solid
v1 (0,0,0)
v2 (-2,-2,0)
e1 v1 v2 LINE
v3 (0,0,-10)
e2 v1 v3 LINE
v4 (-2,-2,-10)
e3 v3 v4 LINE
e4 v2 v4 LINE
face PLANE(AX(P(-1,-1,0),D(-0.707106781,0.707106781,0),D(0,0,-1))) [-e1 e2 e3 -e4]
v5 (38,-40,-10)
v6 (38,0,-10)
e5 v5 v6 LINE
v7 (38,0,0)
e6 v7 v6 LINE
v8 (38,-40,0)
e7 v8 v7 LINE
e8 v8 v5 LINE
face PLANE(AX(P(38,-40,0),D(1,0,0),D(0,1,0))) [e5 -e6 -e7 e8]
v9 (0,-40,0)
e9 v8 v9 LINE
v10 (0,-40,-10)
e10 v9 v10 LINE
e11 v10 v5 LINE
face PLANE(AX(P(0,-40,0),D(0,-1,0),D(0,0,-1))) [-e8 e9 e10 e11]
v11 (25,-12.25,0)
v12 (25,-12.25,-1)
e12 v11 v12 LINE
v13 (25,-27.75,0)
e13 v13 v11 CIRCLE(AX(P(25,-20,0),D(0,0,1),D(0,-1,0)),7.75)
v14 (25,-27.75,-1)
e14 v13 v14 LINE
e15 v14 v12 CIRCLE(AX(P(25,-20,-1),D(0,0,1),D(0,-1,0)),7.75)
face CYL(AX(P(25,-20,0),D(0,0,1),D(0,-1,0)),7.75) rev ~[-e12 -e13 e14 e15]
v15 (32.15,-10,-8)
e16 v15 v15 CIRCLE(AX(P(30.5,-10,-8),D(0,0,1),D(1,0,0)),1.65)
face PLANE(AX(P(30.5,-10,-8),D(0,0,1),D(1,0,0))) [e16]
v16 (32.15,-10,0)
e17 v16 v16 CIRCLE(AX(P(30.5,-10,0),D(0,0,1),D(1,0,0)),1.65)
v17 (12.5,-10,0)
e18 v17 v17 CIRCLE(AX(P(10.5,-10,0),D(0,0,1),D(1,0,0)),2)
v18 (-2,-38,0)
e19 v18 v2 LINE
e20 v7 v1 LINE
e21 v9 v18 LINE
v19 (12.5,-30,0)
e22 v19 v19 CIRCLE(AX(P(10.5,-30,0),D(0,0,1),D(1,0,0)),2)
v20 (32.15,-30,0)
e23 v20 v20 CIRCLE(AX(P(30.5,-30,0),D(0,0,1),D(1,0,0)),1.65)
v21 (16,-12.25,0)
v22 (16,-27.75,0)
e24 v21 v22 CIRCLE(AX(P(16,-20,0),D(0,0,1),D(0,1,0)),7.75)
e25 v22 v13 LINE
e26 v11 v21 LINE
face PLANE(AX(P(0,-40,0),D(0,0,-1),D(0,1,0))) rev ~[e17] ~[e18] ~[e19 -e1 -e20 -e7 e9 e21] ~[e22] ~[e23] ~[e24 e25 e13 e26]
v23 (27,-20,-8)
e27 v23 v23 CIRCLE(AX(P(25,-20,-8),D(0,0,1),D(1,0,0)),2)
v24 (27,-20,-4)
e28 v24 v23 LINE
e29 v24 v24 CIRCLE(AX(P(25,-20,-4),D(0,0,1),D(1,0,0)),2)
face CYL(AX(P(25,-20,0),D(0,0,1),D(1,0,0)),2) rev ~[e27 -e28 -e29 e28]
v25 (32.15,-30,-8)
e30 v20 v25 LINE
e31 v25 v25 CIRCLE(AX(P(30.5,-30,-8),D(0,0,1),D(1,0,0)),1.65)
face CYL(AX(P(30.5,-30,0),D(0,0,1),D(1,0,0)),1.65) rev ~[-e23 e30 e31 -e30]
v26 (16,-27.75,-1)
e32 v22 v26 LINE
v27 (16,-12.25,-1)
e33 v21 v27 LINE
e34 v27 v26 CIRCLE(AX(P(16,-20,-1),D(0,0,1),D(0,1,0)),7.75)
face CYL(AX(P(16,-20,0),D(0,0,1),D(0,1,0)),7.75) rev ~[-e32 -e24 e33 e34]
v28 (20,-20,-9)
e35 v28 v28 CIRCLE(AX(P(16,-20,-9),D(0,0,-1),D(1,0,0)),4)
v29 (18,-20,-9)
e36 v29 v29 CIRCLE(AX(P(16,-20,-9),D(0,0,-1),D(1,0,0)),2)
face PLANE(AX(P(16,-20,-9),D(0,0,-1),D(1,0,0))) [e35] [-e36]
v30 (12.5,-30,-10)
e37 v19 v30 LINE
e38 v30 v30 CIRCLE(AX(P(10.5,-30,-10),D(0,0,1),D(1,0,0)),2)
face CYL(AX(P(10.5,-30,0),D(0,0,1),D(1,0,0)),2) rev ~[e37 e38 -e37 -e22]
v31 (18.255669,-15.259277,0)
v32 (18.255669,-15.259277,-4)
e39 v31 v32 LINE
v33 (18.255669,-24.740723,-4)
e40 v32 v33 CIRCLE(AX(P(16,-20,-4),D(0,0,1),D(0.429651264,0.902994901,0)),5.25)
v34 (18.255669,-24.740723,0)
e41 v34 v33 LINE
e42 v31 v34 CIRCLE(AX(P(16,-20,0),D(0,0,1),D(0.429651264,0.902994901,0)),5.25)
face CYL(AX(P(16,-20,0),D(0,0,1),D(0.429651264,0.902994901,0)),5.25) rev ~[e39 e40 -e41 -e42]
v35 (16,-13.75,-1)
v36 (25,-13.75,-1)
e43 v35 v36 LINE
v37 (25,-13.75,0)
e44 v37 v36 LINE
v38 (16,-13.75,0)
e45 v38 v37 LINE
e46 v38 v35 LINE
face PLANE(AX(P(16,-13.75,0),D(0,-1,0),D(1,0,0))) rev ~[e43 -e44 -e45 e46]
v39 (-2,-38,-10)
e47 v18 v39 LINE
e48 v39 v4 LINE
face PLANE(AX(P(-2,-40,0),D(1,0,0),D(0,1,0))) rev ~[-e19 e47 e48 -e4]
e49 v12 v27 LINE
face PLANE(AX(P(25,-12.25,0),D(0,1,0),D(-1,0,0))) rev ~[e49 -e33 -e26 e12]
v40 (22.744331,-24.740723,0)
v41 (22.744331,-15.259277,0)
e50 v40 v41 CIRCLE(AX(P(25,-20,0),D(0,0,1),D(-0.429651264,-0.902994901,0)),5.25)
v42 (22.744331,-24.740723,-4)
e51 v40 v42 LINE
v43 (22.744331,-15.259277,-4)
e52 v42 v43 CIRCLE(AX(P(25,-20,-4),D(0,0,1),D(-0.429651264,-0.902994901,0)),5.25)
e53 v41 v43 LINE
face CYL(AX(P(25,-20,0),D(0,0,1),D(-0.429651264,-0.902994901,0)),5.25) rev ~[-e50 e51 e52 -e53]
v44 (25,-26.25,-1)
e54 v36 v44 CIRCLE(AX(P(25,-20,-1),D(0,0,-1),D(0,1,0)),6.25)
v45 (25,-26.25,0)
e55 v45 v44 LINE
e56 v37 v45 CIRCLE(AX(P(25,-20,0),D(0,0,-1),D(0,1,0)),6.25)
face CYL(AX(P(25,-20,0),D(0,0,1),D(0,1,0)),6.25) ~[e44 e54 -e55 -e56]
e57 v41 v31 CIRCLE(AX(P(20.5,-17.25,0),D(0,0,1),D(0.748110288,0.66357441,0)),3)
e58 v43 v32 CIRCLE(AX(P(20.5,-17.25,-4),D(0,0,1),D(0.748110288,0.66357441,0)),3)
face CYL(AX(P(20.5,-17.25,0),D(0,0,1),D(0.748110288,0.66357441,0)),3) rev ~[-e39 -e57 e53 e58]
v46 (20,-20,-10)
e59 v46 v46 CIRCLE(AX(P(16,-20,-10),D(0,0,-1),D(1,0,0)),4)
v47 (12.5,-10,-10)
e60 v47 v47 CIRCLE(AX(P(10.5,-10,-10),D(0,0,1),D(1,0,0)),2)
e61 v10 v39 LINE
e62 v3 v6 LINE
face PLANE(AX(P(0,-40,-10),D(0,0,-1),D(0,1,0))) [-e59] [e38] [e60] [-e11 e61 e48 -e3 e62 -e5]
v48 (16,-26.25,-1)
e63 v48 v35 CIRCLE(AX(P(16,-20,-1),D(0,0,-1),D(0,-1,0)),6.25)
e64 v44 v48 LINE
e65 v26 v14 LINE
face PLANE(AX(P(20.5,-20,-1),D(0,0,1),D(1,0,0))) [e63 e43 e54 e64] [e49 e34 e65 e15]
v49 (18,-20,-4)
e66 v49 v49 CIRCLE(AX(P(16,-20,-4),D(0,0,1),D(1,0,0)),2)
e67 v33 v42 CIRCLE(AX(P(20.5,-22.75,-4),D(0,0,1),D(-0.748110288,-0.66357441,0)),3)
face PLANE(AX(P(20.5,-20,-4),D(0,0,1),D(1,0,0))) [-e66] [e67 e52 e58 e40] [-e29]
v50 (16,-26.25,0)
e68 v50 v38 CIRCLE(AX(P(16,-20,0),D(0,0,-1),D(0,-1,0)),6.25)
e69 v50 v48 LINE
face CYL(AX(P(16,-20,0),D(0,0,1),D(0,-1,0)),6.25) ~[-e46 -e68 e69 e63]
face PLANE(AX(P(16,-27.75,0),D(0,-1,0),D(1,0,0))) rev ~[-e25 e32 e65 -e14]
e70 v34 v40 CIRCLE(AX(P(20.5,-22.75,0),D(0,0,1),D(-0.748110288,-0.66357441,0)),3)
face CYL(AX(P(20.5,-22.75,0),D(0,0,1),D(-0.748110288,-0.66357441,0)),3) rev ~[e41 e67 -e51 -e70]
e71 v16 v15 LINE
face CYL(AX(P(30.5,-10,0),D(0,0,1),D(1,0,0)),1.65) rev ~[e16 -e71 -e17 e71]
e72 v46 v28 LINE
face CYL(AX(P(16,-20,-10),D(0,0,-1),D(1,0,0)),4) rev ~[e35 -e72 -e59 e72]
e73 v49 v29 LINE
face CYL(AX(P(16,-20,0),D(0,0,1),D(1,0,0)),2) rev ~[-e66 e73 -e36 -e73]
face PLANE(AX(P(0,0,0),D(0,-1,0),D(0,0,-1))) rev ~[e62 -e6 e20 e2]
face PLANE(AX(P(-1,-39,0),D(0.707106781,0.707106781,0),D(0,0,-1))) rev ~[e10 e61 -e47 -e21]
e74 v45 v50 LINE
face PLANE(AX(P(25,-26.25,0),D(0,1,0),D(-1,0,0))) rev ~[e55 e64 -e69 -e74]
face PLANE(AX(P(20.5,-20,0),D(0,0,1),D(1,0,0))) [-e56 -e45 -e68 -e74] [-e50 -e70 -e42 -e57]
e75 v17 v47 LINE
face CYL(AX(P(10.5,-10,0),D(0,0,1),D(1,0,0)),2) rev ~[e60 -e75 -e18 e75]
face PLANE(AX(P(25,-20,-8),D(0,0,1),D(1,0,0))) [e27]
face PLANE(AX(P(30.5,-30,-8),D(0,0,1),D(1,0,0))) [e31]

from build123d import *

# Parameters (mm, degrees)
F0_W      = 41
F0_H      = 40
F0_R      = 2
F0_R_2    = 1.65
F1_DEPTH  = 10
F2_DEPTH  = 1
F3_DEPTH  = 8
F4_DEPTH  = 4
F5_R      = 4
F5_R_2    = 2
F6_DEPTH  = 1
F7_DEPTH  = 8
F8_DEPTH  = 2
F9_SIZE   = 2
F10_DEPTH = 3


# Not quite as in the source:
# - a feature names something its author has since deleted; it is built from what else it names


with BuildPart() as f1:
    # F0 (on Top) → F1 (new body)
    with BuildSketch(Plane.XY):
        with Locations((20.5, -20)):
            Rectangle(F0_W, F0_H)
        with Locations((10.5, -30)):
            Circle(F0_R, mode=Mode.SUBTRACT)
        with Locations((30.5, -30)):
            Circle(F0_R_2, mode=Mode.SUBTRACT)
        with Locations((10.5, -10)):
            Circle(F0_R, mode=Mode.SUBTRACT)
        with BuildLine():
            Line((25, -27.75), (16, -27.75))
            ThreePointArc((16, -27.75), (8.25, -20), (16, -12.25))
            Line((16, -12.25), (25, -12.25))
            ThreePointArc((25, -12.25), (32.75, -20), (25, -27.75))
        make_face(mode=Mode.SUBTRACT)
        with Locations((30.5, -10)):
            Circle(F0_R_2, mode=Mode.SUBTRACT)
        with BuildLine():
            ThreePointArc((16, -12.25), (8.25, -20), (16, -27.75))
            Line((16, -27.75), (25, -27.75))
            ThreePointArc((25, -27.75), (32.75, -20), (25, -12.25))
            Line((25, -12.25), (16, -12.25))
        make_face()
        with BuildLine():
            ThreePointArc((16, -26.25), (9.75, -20), (16, -13.75))
            Line((16, -13.75), (25, -13.75))
            ThreePointArc((25, -13.75), (31.25, -20), (25, -26.25))
            Line((25, -26.25), (16, -26.25))
        make_face(mode=Mode.SUBTRACT)
        with BuildLine():
            Line((25, -13.75), (16, -13.75))
            ThreePointArc((16, -13.75), (9.75, -20), (16, -26.25))
            Line((16, -26.25), (25, -26.25))
            ThreePointArc((25, -26.25), (31.25, -20), (25, -13.75))
        make_face()
        with BuildLine():
            ThreePointArc((22.7443308628, -15.25927677), (30.25, -20), (22.7443308628, -24.74072323))
            ThreePointArc((22.7443308628, -24.74072323), (20.5, -25.75), (18.2556691372, -24.74072323))
            ThreePointArc((18.2556691372, -24.74072323), (10.75, -20), (18.2556691372, -15.25927677))
            ThreePointArc((18.2556691372, -15.25927677), (20.5, -14.25), (22.7443308628, -15.25927677))
        make_face(mode=Mode.SUBTRACT)
        with BuildLine():
            ThreePointArc((18.2556691372, -24.74072323), (20.5, -25.75), (22.7443308628, -24.74072323))
            ThreePointArc((22.7443308628, -24.74072323), (30.25, -20), (22.7443308628, -15.25927677))
            ThreePointArc((22.7443308628, -15.25927677), (20.5, -14.25), (18.2556691372, -15.25927677))
            ThreePointArc((18.2556691372, -15.25927677), (10.75, -20), (18.2556691372, -24.74072323))
        make_face()
        with Locations((16, -20)):
            Circle(F0_R, mode=Mode.SUBTRACT)
        with Locations((25, -20)):
            Circle(F0_R, mode=Mode.SUBTRACT)
        with Locations((25, -20)):
            Circle(F0_R)
        with Locations((30.5, -10)):
            Circle(F0_R_2)
        with Locations((30.5, -30)):
            Circle(F0_R_2)
    extrude(amount=-F1_DEPTH)

    # F0 (on Top) → F2 (cut)
    with BuildSketch(Plane.XY):
        with BuildLine():
            ThreePointArc((16, -12.25), (8.25, -20), (16, -27.75))
            Line((16, -27.75), (25, -27.75))
            ThreePointArc((25, -27.75), (32.75, -20), (25, -12.25))
            Line((25, -12.25), (16, -12.25))
        make_face()
        with BuildLine():
            ThreePointArc((16, -26.25), (9.75, -20), (16, -13.75))
            Line((16, -13.75), (25, -13.75))
            ThreePointArc((25, -13.75), (31.25, -20), (25, -26.25))
            Line((25, -26.25), (16, -26.25))
        make_face(mode=Mode.SUBTRACT)
    extrude(amount=-F2_DEPTH, mode=Mode.SUBTRACT)

    # F0 (on Top) → F3 (cut)
    with BuildSketch(Plane.XY):
        with Locations((25, -20)):
            Circle(F0_R)
    extrude(amount=-F3_DEPTH, mode=Mode.SUBTRACT)

    # F0 (on Top) → F4 (cut)
    with BuildSketch(Plane.XY):
        with BuildLine():
            ThreePointArc((18.2556691372, -24.74072323), (20.5, -25.75), (22.7443308628, -24.74072323))
            ThreePointArc((22.7443308628, -24.74072323), (30.25, -20), (22.7443308628, -15.25927677))
            ThreePointArc((22.7443308628, -15.25927677), (20.5, -14.25), (18.2556691372, -15.25927677))
            ThreePointArc((18.2556691372, -15.25927677), (10.75, -20), (18.2556691372, -24.74072323))
        make_face()
        with Locations((16, -20)):
            Circle(F0_R, mode=Mode.SUBTRACT)
        with Locations((25, -20)):
            Circle(F0_R, mode=Mode.SUBTRACT)
    extrude(amount=-F4_DEPTH, mode=Mode.SUBTRACT)

    # F5 (on face) → F6 (cut)
    with BuildSketch(Plane(origin=(0, 0, -10), x_dir=(1, 0, 0), z_dir=(0, 0, -1))):
        with Locations((16, 20)):
            Circle(F5_R)
        with Locations((16, 20)):
            Circle(F5_R_2, mode=Mode.SUBTRACT)
    extrude(amount=-F6_DEPTH, mode=Mode.SUBTRACT)

    # F0 (on Top) → F7 (cut)
    with BuildSketch(Plane.XY):
        with Locations((30.5, -30)):
            Circle(F0_R_2)
        with Locations((30.5, -10)):
            Circle(F0_R_2)
    extrude(amount=-F7_DEPTH, mode=Mode.SUBTRACT)

    # F8 (add): a face of the model
    f8_faces = [f1.faces().sort_by_distance(p)[0] for p in [
        (0, -20, -5),
    ]]
    extrude(f8_faces, amount=F8_DEPTH)

    # F9
    f9_edges = [f1.edges().sort_by_distance(p)[0] for p in [
        (-2, -40, -5),
        (-2, 0, -5),
    ]]
    chamfer(f9_edges, length=F9_SIZE)

    # F10 (cut): a face of the model
    f10_faces = [f1.faces().sort_by_distance(p)[0] for p in [
        (41, -20, -5),
    ]]
    extrude(f10_faces, amount=-F10_DEPTH, mode=Mode.SUBTRACT)


solid = f1.part
